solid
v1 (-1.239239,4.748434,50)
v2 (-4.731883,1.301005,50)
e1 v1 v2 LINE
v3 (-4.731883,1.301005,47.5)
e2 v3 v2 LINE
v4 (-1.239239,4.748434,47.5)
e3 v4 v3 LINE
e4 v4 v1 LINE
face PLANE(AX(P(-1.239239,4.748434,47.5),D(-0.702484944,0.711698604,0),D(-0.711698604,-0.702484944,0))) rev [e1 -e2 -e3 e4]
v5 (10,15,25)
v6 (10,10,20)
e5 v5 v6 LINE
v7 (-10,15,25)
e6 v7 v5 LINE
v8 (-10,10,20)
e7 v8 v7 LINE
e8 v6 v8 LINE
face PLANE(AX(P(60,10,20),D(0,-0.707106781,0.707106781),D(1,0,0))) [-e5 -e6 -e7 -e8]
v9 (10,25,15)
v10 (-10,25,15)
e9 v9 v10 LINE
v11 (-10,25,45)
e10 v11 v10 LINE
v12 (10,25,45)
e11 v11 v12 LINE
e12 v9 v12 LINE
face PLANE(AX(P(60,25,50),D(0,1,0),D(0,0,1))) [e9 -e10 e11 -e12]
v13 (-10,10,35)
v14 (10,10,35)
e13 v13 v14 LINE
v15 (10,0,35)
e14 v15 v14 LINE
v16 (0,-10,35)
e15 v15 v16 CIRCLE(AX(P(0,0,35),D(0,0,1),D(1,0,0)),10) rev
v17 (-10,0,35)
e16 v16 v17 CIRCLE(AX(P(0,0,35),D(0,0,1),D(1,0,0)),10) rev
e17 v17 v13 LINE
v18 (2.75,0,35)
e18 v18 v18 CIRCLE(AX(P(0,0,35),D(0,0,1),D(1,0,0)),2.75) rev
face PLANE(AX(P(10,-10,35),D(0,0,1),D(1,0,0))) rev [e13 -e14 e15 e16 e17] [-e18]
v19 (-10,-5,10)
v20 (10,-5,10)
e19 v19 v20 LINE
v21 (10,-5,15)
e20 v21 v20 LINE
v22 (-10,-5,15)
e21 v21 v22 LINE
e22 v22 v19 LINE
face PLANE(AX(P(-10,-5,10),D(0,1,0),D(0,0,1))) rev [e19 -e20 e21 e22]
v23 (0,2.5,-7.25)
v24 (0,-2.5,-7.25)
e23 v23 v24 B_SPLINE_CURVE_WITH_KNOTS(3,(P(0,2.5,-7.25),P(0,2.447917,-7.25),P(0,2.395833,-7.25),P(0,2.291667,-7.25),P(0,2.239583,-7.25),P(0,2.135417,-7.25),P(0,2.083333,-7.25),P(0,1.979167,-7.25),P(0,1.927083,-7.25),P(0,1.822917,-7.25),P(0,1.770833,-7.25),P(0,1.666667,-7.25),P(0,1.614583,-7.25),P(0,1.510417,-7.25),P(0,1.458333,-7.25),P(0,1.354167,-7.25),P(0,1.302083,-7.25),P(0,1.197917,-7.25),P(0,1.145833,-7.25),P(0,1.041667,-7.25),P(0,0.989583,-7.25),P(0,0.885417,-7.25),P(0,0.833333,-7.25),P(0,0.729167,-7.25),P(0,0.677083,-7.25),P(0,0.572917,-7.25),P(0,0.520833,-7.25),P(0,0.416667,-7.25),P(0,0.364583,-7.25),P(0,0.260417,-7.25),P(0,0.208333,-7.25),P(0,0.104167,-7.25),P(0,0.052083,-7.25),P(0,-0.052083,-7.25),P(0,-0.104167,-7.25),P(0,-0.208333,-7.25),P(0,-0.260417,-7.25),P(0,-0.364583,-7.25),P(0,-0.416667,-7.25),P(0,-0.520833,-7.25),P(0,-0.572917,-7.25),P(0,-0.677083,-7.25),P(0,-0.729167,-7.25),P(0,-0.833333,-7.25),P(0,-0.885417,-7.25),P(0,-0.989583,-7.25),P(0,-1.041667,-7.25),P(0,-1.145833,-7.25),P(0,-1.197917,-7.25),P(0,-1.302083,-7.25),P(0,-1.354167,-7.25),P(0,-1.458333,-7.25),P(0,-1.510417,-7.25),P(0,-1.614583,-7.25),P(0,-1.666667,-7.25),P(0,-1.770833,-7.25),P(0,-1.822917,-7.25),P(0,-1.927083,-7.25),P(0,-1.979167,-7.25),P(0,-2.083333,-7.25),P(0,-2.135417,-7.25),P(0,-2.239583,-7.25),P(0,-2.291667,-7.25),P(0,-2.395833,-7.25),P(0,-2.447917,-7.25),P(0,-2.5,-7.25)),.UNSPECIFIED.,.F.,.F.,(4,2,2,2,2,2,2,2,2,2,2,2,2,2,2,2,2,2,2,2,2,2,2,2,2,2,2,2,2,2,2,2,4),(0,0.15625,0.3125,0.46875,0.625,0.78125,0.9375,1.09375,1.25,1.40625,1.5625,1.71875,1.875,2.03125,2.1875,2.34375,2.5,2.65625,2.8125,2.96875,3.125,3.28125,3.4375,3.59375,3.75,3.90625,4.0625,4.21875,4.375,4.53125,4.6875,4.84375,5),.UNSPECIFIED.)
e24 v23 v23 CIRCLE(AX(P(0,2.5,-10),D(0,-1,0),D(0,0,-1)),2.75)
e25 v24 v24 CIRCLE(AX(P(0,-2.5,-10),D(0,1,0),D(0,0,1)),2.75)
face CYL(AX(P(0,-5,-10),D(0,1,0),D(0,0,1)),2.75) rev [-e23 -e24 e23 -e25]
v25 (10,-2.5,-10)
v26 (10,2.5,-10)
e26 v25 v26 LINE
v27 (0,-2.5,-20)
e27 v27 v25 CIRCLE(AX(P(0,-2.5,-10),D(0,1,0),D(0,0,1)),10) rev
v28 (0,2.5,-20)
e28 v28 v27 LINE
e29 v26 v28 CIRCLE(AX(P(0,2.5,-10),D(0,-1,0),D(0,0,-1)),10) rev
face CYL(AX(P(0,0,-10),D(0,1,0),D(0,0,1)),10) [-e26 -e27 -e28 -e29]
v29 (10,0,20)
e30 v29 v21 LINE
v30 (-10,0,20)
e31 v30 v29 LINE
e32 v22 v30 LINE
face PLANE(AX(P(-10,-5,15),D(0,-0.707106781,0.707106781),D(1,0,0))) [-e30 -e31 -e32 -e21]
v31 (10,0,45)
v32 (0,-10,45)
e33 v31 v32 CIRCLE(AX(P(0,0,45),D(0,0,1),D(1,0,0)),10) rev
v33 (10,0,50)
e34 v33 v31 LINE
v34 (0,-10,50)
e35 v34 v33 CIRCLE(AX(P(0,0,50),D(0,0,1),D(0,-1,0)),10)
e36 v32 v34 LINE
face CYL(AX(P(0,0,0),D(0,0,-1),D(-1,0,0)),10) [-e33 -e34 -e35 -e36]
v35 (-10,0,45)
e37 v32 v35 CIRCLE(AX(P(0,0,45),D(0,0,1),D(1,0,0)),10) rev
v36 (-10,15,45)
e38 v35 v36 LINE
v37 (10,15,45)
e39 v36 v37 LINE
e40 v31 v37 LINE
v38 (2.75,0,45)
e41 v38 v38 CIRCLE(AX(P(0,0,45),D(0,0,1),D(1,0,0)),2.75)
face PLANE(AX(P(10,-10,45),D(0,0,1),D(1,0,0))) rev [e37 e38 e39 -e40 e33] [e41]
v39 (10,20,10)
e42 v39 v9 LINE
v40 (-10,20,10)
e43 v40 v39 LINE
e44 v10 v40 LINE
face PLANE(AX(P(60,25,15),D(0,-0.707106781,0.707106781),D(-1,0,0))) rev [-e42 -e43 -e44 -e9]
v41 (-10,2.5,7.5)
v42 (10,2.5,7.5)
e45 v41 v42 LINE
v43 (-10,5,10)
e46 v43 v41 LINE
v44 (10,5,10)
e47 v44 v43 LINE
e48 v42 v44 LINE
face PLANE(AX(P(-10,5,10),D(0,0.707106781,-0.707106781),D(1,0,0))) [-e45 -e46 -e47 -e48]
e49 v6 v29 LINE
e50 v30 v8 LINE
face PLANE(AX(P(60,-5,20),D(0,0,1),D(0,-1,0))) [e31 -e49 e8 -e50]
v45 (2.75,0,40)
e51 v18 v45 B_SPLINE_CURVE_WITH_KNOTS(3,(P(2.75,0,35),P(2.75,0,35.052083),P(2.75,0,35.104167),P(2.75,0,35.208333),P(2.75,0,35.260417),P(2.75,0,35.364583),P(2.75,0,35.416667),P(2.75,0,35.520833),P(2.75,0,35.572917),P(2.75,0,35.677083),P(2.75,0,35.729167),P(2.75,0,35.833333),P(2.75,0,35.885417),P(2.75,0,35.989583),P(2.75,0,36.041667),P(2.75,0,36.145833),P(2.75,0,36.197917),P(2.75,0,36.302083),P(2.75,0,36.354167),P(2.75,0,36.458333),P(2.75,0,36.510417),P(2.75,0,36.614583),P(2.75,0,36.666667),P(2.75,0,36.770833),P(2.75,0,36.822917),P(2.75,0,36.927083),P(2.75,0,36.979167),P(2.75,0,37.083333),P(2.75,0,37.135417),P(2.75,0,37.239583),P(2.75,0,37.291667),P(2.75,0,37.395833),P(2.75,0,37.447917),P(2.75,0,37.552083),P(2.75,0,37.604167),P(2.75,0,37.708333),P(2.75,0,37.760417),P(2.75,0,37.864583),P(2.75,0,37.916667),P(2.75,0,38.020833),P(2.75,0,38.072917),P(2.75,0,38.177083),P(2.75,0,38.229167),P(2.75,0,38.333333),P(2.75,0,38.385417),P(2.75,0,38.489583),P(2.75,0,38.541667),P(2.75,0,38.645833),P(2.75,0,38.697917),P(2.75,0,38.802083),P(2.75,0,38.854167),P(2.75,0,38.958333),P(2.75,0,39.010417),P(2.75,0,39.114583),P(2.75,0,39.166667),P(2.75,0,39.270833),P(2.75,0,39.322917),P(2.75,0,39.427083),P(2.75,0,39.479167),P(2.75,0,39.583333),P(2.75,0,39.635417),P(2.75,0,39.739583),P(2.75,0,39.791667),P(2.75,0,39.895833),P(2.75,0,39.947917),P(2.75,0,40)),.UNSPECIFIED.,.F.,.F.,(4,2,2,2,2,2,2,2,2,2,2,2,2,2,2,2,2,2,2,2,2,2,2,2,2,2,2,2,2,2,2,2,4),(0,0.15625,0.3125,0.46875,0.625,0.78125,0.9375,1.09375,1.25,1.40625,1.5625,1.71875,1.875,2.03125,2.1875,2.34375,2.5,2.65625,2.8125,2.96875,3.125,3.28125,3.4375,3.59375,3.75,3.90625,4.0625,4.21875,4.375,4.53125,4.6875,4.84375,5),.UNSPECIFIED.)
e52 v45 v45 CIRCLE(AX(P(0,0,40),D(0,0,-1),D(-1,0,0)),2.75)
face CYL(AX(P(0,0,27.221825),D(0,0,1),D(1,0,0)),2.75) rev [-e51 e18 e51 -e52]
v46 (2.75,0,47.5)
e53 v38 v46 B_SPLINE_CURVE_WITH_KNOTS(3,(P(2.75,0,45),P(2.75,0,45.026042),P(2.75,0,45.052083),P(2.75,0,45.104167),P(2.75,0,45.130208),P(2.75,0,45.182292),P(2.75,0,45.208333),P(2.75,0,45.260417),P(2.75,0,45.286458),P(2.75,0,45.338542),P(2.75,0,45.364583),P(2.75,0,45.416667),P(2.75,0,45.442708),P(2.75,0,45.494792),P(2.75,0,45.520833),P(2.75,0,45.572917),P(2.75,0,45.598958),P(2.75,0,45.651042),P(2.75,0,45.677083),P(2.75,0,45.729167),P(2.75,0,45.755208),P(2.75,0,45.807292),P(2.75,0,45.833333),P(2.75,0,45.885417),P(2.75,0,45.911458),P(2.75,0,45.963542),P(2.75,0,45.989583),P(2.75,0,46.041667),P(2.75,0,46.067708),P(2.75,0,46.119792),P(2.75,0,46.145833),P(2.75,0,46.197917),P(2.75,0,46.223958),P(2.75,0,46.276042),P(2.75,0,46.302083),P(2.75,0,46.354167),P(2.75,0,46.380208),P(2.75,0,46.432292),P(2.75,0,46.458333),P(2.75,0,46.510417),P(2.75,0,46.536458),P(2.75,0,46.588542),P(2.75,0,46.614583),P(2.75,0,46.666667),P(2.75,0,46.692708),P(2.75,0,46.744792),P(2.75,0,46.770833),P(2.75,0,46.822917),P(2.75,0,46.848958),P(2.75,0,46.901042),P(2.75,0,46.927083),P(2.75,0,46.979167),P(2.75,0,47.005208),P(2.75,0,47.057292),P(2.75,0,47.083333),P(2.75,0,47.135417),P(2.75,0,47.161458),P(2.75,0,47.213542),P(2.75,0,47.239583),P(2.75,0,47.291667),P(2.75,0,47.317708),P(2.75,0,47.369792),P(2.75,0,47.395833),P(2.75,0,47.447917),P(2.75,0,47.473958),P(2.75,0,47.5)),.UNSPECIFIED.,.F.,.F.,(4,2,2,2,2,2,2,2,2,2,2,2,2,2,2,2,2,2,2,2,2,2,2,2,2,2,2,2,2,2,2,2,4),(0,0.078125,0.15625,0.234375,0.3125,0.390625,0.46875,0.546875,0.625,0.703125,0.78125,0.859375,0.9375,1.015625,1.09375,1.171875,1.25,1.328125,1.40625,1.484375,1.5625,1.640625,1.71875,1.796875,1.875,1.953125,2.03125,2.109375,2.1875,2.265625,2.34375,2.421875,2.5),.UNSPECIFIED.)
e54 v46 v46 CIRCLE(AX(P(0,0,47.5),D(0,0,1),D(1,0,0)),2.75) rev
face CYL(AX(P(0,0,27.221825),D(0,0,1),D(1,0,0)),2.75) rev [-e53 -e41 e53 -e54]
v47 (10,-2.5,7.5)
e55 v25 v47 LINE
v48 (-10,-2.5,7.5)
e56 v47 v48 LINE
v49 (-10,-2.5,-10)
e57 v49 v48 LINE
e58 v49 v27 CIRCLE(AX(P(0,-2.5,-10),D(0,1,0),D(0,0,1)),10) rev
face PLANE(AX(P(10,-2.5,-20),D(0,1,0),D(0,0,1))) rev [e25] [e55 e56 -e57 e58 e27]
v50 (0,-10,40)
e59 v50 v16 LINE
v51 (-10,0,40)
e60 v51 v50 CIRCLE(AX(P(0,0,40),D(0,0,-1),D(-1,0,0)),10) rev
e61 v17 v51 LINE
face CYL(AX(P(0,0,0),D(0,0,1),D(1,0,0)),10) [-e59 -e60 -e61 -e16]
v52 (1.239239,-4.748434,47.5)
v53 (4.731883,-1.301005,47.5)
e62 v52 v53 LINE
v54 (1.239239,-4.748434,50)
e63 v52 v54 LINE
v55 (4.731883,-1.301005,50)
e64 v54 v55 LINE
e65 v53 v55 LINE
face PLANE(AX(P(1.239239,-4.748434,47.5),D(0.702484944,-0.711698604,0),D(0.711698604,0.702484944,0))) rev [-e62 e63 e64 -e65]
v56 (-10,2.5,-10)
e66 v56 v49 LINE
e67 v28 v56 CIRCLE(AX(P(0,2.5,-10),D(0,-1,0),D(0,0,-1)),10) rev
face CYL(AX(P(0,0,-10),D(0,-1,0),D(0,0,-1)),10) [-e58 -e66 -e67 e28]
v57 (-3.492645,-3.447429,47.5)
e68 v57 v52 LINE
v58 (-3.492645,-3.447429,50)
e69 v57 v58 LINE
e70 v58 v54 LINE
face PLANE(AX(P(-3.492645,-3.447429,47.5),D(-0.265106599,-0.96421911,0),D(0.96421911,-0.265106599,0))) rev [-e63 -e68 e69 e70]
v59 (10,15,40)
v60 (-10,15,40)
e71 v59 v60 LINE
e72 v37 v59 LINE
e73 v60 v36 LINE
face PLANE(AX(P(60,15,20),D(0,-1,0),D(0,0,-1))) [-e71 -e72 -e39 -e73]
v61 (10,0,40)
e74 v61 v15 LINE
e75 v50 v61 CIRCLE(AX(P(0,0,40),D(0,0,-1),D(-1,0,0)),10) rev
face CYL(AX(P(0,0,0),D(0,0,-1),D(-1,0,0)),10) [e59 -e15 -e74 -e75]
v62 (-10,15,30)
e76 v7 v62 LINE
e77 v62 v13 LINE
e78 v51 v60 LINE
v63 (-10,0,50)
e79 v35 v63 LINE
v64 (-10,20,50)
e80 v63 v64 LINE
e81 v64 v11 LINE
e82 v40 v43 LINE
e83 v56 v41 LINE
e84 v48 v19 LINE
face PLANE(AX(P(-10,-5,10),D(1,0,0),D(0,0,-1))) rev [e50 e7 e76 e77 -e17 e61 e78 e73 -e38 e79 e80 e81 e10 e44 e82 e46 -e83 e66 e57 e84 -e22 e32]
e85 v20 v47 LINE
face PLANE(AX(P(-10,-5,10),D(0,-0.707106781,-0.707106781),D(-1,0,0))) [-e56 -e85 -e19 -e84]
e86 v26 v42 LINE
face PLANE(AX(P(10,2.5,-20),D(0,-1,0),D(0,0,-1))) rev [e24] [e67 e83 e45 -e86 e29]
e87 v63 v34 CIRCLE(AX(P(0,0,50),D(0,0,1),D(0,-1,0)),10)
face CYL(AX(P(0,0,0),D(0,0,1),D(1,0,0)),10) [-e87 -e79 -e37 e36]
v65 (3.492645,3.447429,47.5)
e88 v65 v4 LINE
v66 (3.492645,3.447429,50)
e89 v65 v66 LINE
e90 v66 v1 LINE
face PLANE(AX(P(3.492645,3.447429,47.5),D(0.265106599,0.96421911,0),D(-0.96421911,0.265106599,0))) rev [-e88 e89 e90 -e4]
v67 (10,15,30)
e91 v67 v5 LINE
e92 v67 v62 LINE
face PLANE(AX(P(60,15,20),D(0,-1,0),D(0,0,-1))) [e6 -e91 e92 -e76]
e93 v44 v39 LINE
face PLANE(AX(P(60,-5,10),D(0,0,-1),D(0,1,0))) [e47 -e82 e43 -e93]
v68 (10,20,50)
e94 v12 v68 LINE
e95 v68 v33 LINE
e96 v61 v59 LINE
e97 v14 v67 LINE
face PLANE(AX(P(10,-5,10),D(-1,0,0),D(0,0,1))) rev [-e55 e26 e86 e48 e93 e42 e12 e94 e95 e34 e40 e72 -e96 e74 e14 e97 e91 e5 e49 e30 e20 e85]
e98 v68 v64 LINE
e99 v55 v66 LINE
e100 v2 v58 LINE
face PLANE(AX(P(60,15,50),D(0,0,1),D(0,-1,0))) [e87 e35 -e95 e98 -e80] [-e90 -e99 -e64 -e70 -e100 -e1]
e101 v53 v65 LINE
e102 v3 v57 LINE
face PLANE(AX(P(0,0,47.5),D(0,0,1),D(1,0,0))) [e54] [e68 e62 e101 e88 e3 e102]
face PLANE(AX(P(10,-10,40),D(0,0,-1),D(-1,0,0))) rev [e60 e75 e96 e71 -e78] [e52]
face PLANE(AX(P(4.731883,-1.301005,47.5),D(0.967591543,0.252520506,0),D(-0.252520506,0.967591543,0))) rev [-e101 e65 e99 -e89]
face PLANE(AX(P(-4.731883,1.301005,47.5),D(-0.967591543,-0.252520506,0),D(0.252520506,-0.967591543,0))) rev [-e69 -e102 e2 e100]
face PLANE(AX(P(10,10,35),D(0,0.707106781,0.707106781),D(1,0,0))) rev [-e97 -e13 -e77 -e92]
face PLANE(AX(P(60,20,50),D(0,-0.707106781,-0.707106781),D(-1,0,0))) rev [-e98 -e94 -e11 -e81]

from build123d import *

# Parameters (mm, degrees)
SKETCH1_W               = 20
SKETCH1_H               = 10
BOSS_EXTRUDE1_DEPTH     = 10
SKETCH3_W               = 20
SKETCH3_H               = 5
BOSS_EXTRUDE2_DEPTH     = 20
FILLET1_R               = 10
BOSS_EXTRUDE3_DEPTH     = 20
CUT_EXTRUDE1_DEPTH      = 56.733742024
CUT_EXTRUDE1_DEPTH_BACK = 56.733742024
SKETCH5_R               = 2.75
CHAMFER1_SIZE           = 10
SKETCH6_W               = 20
SKETCH6_H               = 5
BOSS_EXTRUDE4_DEPTH     = 25
FILLET2_R               = 10
CUT_EXTRUDE2_DEPTH      = 76
CUT_EXTRUDE2_DEPTH_BACK = 15
SKETCH7_R               = 2.75
CHAMFER3_SIZE           = 5
CUT_EXTRUDE3_DEPTH      = 2.5


# Some blends are built 0.0001 mm under size
with BuildPart() as part:
    # Sketch1 → Boss-Extrude1 (new body)
    with BuildSketch(Plane.XY):
        Rectangle(SKETCH1_W, SKETCH1_H)
    extrude(amount=BOSS_EXTRUDE1_DEPTH)

    # Sketch3 → Boss-Extrude2 (add)
    with BuildSketch(Plane(origin=(0, 0, 0), x_dir=(-1, 0, 0), z_dir=(0, 0, -1))):
        Rectangle(SKETCH3_W, SKETCH3_H)
    extrude(amount=BOSS_EXTRUDE2_DEPTH)

    # Fillet1
    fillet1_edges = [part.edges().sort_by_distance(p)[0] for p in [
        (-10, 0, -20),
        (10, 0, -20),
    ]]
    fillet(fillet1_edges, radius=FILLET1_R - 0.0001)  # a hair under: the kernel refuses the full size

    # Sketch4 → Boss-Extrude3 (add)
    with BuildSketch(Plane.ZY.offset(10)):
        Polygon((20, -5), (20, 15), (50, 15), (50, 25), (10, 25), (10, -5), align=None)
    extrude(amount=-BOSS_EXTRUDE3_DEPTH)

    # Sketch5 → Cut-Extrude1 (cut, two sides: drawn at the far end of the back side and taken through both)
    with BuildSketch(Plane(origin=(0, 2.5, 0), x_dir=(1, 0, 0), z_dir=(0, 1, 0)).offset(-CUT_EXTRUDE1_DEPTH_BACK)):
        with Locations(Location((0, 10, 0), (0, 0, 270))):
            Circle(SKETCH5_R)
    extrude(amount=CUT_EXTRUDE1_DEPTH + CUT_EXTRUDE1_DEPTH_BACK, mode=Mode.SUBTRACT)

    # Chamfer1
    # the kernel refuses this chamfer: 10 mm, written as the material it takes off along each edge
    with BuildSketch(Plane(origin=(35.71682988, 5, 0), x_dir=(0, -0.9996219169112968, -0.027495876610586372), z_dir=(-1, 0, 0))) as chamfer1_piece_1_section:
        Polygon((CHAMFER1_SIZE * 0.999621916911, CHAMFER1_SIZE * 0.0274958766106), (-CHAMFER1_SIZE * 0.0274958766106, CHAMFER1_SIZE * 0.999621916911), (0, 0), align=None)
    chamfer1_piece_1 = extrude(amount=71.433659759, mode=Mode.PRIVATE)
    chamfer1_piece_1 = split(chamfer1_piece_1, bisect_by=Plane(origin=(0, -2.5, 0.578931494), z_dir=(0, -1, 0)), keep=Keep.TOP, mode=Mode.PRIVATE)
    add(chamfer1_piece_1, mode=Mode.SUBTRACT)
    with BuildSketch(Plane(origin=(35.71682988, 5, 0), x_dir=(0, -0.9996219169112968, -0.027495876610586372), z_dir=(-1, 0, 0))) as chamfer1_piece_2_section:
        Polygon((CHAMFER1_SIZE * 0.999621916911, CHAMFER1_SIZE * 0.0274958766106), (-CHAMFER1_SIZE * 0.0274958766106, CHAMFER1_SIZE * 0.999621916911), (0, 0), align=None)
    chamfer1_piece_2 = extrude(amount=71.433659759, mode=Mode.PRIVATE)
    chamfer1_piece_2 = split(chamfer1_piece_2, bisect_by=Plane(origin=(0, 2.5, 4.466280687), z_dir=(0, 1, 0)), keep=Keep.TOP, mode=Mode.PRIVATE)
    chamfer1_piece_2 = split(chamfer1_piece_2, bisect_by=Plane(origin=(0, 3.939233337, 10), z_dir=(0, 0, -1)), keep=Keep.TOP, mode=Mode.PRIVATE)
    add(chamfer1_piece_2, mode=Mode.SUBTRACT)
    with BuildSketch(Plane(origin=(-35.71682988, -5, 0), x_dir=(0, -0.027495876610586403, 0.9996219169112968), z_dir=(1, 0, 0))) as chamfer1_piece_3_section:
        Polygon((CHAMFER1_SIZE * 0.999621916911, -CHAMFER1_SIZE * 0.0274958766106), (-CHAMFER1_SIZE * 0.0274958766106, -CHAMFER1_SIZE * 0.999621916911), (0, 0), align=None)
    chamfer1_piece_3 = extrude(amount=71.433659759, mode=Mode.PRIVATE)
    chamfer1_piece_3 = split(chamfer1_piece_3, bisect_by=Plane(origin=(0, -2.5, 4.487529346), z_dir=(0, -1, 0)), keep=Keep.TOP, mode=Mode.PRIVATE)
    add(chamfer1_piece_3, mode=Mode.SUBTRACT)
    with BuildSketch(Plane(origin=(-35.71682988, -5, 0), x_dir=(0, -0.027495876610586403, 0.9996219169112968), z_dir=(1, 0, 0))) as chamfer1_piece_4_section:
        Polygon((CHAMFER1_SIZE * 0.999621916911, -CHAMFER1_SIZE * 0.0274958766106), (-CHAMFER1_SIZE * 0.0274958766106, -CHAMFER1_SIZE * 0.999621916911), (0, 0), align=None)
    chamfer1_piece_4 = extrude(amount=71.433659759, mode=Mode.PRIVATE)
    chamfer1_piece_4 = split(chamfer1_piece_4, bisect_by=Plane(origin=(0, 2.5, 0.578931494), z_dir=(0, 1, 0)), keep=Keep.TOP, mode=Mode.PRIVATE)
    add(chamfer1_piece_4, mode=Mode.SUBTRACT)

    # Sketch6 → Boss-Extrude4 (add)
    with BuildSketch(Plane.XZ.offset(-15)):
        with Locations((0, 37.5)):
            Rectangle(SKETCH6_W, SKETCH6_H)
        with Locations((0, 47.5)):
            Rectangle(SKETCH6_W, SKETCH6_H)
    extrude(amount=BOSS_EXTRUDE4_DEPTH)

    # Fillet2
    fillet2_edges = [part.edges().sort_by_distance(p)[0] for p in [
        (10, -10, 37.5),
        (-10, -10, 37.5),
        (-10, -10, 47.5),
        (10, -10, 47.5),
    ]]
    fillet(fillet2_edges, radius=FILLET2_R - 0.0001)  # a hair under: the kernel refuses the full size

    # Sketch7 → Cut-Extrude2 (cut, two sides: drawn at the far end of the back side and taken through both)
    with BuildSketch(Plane.XY.offset(50).offset(-CUT_EXTRUDE2_DEPTH_BACK)):
        Circle(SKETCH7_R)
    extrude(amount=CUT_EXTRUDE2_DEPTH + CUT_EXTRUDE2_DEPTH_BACK, mode=Mode.SUBTRACT)

    # Chamfer3
    chamfer3_edges = [part.edges().sort_by_distance(p)[0] for p in [
        (0, 15, 35),
        (0, 25, 10),
        (0, 25, 50),
        (0, 15, 20),
        (0, -5, 20),
    ]]
    chamfer(chamfer3_edges, length=CHAMFER3_SIZE)

    # Sketch8 → Cut-Extrude3 (cut)
    with BuildSketch(Plane.XY.offset(50)):
        Polygon((4.731883381, -1.301004613), (3.492644735, 3.447428909), (-1.239238646, 4.748433522), (-4.731883381, 1.301004613), (-3.492644735, -3.447428909), (1.239238646, -4.748433522), align=None)
    extrude(amount=-CUT_EXTRUDE3_DEPTH, mode=Mode.SUBTRACT)


solid = part.part
